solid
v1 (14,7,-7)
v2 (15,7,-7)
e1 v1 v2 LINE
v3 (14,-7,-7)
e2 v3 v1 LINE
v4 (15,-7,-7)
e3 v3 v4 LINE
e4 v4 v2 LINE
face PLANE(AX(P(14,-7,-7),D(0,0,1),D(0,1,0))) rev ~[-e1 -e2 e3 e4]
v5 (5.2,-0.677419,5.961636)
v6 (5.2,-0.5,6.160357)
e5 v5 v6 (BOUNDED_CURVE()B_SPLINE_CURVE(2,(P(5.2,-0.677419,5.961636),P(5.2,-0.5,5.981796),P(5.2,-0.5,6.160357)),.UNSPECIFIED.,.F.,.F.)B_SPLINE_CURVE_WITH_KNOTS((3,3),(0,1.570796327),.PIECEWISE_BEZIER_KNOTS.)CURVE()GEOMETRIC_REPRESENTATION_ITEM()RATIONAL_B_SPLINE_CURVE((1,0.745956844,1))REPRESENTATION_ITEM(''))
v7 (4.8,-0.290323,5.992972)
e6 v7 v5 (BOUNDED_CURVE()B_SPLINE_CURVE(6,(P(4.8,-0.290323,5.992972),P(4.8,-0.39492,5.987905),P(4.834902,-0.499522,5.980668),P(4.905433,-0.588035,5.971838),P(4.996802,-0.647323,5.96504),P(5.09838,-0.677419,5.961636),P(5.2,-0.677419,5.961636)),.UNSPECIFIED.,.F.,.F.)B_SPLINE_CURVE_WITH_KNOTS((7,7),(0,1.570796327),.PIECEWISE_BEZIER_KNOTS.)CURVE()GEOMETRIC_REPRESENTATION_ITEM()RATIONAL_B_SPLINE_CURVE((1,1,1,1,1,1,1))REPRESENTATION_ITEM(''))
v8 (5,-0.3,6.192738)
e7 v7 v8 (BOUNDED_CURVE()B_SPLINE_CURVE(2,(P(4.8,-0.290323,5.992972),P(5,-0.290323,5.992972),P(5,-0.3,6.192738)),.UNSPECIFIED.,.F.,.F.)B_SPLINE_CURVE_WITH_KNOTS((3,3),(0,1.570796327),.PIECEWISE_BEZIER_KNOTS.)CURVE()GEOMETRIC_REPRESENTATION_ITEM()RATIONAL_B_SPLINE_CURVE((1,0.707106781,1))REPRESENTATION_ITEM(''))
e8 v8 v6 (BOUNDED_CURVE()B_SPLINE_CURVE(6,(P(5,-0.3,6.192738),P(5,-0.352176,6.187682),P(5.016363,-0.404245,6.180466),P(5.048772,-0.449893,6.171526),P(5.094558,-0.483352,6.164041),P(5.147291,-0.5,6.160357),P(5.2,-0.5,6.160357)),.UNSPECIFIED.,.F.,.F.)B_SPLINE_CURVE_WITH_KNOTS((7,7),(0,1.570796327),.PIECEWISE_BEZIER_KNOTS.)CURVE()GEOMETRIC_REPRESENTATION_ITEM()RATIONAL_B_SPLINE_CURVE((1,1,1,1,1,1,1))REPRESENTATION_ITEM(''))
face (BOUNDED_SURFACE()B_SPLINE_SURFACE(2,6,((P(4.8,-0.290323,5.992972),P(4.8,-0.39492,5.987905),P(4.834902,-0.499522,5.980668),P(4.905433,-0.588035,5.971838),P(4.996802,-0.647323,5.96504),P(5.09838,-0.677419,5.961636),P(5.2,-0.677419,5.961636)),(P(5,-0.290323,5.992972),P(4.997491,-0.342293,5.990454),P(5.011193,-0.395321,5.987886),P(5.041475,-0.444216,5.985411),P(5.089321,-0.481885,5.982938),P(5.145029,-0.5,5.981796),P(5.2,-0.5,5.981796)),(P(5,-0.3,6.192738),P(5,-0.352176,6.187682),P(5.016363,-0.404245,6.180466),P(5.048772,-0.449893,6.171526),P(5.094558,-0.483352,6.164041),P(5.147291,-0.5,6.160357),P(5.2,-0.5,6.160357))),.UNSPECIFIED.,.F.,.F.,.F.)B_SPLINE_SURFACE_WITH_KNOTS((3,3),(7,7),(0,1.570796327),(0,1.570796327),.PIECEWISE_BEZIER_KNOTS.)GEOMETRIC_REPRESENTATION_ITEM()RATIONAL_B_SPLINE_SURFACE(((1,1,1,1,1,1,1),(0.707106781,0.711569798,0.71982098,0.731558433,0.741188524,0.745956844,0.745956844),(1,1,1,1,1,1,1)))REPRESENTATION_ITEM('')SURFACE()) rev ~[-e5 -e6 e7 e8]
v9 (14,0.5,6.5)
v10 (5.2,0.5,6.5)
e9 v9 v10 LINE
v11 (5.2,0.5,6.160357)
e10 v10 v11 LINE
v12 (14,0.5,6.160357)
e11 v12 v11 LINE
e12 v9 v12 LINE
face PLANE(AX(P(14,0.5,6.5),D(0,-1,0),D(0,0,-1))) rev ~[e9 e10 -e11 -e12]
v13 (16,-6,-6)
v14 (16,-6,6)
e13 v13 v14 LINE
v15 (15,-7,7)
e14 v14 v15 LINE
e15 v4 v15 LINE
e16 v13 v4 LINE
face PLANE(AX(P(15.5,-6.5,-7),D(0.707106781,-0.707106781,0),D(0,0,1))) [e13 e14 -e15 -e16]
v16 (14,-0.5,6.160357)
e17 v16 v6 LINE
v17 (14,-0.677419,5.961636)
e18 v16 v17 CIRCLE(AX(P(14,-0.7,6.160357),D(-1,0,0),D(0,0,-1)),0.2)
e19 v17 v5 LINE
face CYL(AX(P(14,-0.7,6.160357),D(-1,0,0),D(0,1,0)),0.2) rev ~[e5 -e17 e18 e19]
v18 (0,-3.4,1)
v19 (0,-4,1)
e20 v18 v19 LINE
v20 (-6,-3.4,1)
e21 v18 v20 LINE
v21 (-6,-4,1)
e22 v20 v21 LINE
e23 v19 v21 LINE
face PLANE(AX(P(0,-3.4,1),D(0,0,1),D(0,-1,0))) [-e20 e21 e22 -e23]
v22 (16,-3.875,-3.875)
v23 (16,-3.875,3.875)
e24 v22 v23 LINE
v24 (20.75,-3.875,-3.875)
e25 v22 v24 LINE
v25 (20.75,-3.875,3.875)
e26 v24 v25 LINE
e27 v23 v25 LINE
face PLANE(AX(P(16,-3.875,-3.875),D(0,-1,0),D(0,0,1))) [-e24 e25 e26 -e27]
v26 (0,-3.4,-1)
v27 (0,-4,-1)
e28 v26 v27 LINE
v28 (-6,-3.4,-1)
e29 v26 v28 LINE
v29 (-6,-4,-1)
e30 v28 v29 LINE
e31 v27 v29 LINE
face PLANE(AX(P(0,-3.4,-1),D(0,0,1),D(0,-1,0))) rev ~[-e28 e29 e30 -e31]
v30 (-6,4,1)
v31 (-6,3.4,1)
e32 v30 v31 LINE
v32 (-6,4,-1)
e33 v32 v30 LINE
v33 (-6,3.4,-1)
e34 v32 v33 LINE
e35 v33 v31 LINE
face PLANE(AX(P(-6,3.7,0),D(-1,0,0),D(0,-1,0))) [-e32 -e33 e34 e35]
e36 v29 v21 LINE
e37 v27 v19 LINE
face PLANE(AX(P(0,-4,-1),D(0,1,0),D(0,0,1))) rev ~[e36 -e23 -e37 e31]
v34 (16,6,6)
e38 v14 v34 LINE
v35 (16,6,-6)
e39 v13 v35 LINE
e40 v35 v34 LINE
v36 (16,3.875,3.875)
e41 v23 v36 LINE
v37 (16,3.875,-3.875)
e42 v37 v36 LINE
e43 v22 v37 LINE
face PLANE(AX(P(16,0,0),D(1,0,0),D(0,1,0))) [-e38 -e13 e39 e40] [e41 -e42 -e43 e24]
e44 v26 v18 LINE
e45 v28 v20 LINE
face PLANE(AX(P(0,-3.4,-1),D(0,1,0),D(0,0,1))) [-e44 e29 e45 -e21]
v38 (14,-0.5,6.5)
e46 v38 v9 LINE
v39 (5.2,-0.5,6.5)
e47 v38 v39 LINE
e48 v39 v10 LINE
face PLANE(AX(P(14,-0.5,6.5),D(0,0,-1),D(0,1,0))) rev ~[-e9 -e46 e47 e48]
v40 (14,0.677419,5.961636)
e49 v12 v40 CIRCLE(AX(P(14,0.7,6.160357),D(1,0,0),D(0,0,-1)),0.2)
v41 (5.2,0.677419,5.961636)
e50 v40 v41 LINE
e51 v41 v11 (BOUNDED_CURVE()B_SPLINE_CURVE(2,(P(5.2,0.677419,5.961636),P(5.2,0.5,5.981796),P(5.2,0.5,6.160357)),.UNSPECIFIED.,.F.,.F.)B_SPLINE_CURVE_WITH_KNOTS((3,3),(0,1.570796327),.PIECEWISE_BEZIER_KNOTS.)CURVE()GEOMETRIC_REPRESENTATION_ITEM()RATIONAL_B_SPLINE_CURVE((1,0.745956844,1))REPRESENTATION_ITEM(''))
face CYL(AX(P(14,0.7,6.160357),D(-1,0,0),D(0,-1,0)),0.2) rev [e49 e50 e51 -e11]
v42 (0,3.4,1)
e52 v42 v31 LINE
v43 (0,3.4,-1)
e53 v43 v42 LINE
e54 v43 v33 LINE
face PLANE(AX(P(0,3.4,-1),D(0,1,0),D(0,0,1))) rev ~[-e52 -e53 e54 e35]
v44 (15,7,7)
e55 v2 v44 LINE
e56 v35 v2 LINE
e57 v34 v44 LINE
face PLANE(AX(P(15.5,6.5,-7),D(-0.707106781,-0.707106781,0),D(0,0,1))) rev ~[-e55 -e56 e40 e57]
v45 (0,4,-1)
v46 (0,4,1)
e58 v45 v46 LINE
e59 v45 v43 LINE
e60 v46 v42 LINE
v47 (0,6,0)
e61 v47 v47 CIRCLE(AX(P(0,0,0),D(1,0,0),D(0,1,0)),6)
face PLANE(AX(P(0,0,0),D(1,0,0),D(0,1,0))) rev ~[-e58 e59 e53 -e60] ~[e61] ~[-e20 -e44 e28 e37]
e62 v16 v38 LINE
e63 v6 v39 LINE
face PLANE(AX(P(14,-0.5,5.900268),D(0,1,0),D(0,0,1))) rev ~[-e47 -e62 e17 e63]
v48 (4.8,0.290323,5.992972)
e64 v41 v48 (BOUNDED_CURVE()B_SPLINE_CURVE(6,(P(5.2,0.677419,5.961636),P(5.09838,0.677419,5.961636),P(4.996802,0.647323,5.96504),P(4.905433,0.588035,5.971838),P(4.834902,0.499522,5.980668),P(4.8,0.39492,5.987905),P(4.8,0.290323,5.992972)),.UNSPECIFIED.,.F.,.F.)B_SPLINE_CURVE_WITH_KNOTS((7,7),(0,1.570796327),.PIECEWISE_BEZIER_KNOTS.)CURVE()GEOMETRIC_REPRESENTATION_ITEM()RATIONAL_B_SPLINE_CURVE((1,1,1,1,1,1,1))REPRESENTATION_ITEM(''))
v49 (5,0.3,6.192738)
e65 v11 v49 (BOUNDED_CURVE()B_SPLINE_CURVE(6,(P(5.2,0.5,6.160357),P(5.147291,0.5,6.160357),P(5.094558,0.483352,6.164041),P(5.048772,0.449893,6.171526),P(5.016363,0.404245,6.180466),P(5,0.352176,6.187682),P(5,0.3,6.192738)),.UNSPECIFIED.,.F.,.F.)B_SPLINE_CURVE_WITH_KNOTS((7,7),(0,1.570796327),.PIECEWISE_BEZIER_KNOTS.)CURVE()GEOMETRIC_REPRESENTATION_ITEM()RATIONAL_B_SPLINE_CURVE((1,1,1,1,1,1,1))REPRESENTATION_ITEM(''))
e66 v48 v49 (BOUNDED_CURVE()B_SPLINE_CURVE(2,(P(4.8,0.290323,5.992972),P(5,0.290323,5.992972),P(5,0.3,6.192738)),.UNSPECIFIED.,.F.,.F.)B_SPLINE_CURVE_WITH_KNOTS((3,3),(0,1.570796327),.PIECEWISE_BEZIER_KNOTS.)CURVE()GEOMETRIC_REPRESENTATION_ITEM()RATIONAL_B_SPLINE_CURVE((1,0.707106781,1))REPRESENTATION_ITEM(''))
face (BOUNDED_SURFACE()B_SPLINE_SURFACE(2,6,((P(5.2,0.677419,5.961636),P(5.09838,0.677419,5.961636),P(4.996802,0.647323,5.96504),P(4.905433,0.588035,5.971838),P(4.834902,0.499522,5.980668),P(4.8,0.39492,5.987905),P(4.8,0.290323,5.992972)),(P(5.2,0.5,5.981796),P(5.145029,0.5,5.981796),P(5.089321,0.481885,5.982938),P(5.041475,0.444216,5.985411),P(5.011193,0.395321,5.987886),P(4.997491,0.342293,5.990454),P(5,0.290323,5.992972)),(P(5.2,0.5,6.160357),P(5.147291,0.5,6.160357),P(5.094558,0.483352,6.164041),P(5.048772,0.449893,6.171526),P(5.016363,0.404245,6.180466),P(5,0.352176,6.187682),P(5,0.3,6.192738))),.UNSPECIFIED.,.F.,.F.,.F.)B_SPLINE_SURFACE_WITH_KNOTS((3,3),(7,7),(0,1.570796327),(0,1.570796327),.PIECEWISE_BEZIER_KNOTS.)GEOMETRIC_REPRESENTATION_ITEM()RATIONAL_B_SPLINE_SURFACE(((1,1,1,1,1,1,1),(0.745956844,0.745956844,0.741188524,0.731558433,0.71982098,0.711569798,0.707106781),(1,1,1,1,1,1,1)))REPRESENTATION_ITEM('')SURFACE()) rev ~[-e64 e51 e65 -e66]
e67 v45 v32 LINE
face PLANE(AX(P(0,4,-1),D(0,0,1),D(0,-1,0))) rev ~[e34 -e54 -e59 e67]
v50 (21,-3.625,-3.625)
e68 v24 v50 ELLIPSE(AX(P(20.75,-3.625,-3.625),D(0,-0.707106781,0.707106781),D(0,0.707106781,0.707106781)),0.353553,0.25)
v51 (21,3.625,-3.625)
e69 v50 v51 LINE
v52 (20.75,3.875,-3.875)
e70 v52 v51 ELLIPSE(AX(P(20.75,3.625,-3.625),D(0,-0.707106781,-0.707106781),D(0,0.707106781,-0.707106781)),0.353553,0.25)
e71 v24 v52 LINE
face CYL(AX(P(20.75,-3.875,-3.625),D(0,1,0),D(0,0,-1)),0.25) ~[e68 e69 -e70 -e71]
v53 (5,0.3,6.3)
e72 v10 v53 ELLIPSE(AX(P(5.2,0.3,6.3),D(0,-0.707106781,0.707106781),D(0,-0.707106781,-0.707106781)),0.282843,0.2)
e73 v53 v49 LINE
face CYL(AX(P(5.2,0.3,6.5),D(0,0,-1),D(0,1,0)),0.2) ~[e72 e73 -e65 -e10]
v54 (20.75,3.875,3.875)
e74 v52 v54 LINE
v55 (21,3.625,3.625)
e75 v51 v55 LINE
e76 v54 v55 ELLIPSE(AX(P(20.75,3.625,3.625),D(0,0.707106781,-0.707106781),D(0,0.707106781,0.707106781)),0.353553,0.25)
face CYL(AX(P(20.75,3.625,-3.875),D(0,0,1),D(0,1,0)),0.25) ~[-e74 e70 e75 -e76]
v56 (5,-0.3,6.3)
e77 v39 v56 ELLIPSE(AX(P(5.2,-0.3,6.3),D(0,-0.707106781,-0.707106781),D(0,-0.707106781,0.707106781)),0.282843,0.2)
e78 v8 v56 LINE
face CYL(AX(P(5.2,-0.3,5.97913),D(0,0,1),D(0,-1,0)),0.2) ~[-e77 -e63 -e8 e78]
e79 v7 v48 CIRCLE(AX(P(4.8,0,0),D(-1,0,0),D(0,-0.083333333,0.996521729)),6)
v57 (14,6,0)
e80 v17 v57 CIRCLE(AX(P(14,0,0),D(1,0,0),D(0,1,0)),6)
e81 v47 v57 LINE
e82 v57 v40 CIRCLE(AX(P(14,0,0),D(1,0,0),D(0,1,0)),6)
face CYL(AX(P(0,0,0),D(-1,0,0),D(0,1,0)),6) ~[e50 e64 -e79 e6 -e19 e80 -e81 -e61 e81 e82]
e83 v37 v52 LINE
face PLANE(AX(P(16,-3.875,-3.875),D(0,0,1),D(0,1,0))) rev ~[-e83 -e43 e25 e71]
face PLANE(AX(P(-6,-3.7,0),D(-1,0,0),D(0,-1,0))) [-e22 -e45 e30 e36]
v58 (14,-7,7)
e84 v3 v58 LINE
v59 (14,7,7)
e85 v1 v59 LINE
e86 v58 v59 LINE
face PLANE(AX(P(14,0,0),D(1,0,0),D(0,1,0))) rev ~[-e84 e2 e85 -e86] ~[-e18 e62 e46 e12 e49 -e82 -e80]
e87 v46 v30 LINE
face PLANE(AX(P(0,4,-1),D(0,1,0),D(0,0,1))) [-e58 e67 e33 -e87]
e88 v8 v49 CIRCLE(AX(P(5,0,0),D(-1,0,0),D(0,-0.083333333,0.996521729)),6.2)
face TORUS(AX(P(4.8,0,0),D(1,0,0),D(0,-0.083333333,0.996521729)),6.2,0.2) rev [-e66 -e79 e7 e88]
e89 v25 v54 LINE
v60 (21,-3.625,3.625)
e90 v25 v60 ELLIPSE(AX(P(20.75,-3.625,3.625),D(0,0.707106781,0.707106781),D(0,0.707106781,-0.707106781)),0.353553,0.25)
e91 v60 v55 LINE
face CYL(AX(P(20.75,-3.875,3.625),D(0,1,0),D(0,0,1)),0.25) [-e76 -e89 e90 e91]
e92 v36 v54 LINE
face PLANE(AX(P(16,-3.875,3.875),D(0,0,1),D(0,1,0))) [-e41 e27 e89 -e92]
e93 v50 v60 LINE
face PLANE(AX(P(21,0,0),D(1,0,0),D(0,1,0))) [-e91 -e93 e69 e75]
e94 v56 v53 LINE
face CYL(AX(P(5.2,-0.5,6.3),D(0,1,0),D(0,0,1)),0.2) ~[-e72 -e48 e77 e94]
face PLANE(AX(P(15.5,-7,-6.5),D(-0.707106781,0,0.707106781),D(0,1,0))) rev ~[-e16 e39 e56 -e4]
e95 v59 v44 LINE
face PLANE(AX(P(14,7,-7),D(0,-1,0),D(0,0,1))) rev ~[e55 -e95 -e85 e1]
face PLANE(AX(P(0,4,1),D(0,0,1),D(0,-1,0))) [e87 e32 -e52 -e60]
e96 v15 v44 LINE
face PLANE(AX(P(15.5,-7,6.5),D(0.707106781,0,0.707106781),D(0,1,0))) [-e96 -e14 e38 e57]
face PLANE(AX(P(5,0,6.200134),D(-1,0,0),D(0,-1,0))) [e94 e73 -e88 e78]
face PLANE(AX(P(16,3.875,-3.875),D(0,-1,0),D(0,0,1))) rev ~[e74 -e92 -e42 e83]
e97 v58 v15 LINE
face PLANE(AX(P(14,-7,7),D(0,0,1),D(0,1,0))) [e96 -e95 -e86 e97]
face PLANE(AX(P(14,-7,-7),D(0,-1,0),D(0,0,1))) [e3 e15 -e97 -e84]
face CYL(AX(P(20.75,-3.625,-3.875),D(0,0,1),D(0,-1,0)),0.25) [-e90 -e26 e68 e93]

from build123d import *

# Parameters (mm, degrees)
F0_R      = 6
F1_DEPTH  = 14
F2_W      = 14
F2_H      = 14
F3_DEPTH  = 2
F4_W      = 7.75
F4_H      = 7.75
F5_DEPTH  = 5
F6_W      = 0.6
F6_H      = 2
F7_DEPTH  = 6
F8_R      = 0.25
F9_SIZE   = 1
F11_DEPTH = 9
F12_R     = 0.2


with BuildPart() as f1:
    # F0 (on Right) → F1 (new body)
    with BuildSketch(Plane.YZ):
        Circle(F0_R)
    extrude(amount=F1_DEPTH)

    # F2 (on face) → F3 (join)
    with BuildSketch(Plane.YZ.offset(14)):
        Rectangle(F2_W, F2_H)
    extrude(amount=F3_DEPTH)

    # F4 (on face) → F5 (join)
    with BuildSketch(Plane.YZ.offset(16)):
        Rectangle(F4_W, F4_H)
    extrude(amount=F5_DEPTH)

    # F6 (on face) → F7 (join)
    with BuildSketch(Plane(origin=(0, 0, 0), x_dir=(0, -1, 0), z_dir=(-1, 0, 0))):
        with Locations((-3.7, 0)):
            Rectangle(F6_W, F6_H)
        with Locations((3.7, 0)):
            Rectangle(F6_W, F6_H)
    extrude(amount=F7_DEPTH)

    # F8
    f8_edges = [f1.edges().sort_by_distance(p)[0] for p in [
        (21, 0, 3.875),
        (21, -3.875, 0),
        (21, 0, -3.875),
        (21, 3.875, 0),
    ]]
    fillet(f8_edges, radius=F8_R)

    # F9
    f9_edges = [f1.edges().sort_by_distance(p)[0] for p in [
        (16, 0, -7),
        (16, -7, 0),
        (16, 0, 7),
        (16, 7, 0),
    ]]
    chamfer(f9_edges, length=F9_SIZE)

    # F10 (on face) → F11 (join)
    with BuildSketch(Plane(origin=(14, 0, 0), x_dir=(0, -1, 0), z_dir=(-1, 0, 0))):
        Polygon((0.5, 6.5), (-0.5, 6.5), (-0.5, 6), (-0.5, 5.9002675116), (0.5, 5.9002675116), (0.5, 6), align=None)
    extrude(amount=F11_DEPTH)

    # F12
    f12_edges = [f1.edges().sort_by_distance(p)[0] for p in [
        (5, -0.5, 6.239565),
        (5, 0, 6),
        (5, 0.5, 6.239565),
        (5, 0, 6.5),
        (9.5, -0.5, 5.97913),
        (9.5, 0.5, 5.97913),
    ]]
    fillet(f12_edges, radius=F12_R)


solid = f1.part
